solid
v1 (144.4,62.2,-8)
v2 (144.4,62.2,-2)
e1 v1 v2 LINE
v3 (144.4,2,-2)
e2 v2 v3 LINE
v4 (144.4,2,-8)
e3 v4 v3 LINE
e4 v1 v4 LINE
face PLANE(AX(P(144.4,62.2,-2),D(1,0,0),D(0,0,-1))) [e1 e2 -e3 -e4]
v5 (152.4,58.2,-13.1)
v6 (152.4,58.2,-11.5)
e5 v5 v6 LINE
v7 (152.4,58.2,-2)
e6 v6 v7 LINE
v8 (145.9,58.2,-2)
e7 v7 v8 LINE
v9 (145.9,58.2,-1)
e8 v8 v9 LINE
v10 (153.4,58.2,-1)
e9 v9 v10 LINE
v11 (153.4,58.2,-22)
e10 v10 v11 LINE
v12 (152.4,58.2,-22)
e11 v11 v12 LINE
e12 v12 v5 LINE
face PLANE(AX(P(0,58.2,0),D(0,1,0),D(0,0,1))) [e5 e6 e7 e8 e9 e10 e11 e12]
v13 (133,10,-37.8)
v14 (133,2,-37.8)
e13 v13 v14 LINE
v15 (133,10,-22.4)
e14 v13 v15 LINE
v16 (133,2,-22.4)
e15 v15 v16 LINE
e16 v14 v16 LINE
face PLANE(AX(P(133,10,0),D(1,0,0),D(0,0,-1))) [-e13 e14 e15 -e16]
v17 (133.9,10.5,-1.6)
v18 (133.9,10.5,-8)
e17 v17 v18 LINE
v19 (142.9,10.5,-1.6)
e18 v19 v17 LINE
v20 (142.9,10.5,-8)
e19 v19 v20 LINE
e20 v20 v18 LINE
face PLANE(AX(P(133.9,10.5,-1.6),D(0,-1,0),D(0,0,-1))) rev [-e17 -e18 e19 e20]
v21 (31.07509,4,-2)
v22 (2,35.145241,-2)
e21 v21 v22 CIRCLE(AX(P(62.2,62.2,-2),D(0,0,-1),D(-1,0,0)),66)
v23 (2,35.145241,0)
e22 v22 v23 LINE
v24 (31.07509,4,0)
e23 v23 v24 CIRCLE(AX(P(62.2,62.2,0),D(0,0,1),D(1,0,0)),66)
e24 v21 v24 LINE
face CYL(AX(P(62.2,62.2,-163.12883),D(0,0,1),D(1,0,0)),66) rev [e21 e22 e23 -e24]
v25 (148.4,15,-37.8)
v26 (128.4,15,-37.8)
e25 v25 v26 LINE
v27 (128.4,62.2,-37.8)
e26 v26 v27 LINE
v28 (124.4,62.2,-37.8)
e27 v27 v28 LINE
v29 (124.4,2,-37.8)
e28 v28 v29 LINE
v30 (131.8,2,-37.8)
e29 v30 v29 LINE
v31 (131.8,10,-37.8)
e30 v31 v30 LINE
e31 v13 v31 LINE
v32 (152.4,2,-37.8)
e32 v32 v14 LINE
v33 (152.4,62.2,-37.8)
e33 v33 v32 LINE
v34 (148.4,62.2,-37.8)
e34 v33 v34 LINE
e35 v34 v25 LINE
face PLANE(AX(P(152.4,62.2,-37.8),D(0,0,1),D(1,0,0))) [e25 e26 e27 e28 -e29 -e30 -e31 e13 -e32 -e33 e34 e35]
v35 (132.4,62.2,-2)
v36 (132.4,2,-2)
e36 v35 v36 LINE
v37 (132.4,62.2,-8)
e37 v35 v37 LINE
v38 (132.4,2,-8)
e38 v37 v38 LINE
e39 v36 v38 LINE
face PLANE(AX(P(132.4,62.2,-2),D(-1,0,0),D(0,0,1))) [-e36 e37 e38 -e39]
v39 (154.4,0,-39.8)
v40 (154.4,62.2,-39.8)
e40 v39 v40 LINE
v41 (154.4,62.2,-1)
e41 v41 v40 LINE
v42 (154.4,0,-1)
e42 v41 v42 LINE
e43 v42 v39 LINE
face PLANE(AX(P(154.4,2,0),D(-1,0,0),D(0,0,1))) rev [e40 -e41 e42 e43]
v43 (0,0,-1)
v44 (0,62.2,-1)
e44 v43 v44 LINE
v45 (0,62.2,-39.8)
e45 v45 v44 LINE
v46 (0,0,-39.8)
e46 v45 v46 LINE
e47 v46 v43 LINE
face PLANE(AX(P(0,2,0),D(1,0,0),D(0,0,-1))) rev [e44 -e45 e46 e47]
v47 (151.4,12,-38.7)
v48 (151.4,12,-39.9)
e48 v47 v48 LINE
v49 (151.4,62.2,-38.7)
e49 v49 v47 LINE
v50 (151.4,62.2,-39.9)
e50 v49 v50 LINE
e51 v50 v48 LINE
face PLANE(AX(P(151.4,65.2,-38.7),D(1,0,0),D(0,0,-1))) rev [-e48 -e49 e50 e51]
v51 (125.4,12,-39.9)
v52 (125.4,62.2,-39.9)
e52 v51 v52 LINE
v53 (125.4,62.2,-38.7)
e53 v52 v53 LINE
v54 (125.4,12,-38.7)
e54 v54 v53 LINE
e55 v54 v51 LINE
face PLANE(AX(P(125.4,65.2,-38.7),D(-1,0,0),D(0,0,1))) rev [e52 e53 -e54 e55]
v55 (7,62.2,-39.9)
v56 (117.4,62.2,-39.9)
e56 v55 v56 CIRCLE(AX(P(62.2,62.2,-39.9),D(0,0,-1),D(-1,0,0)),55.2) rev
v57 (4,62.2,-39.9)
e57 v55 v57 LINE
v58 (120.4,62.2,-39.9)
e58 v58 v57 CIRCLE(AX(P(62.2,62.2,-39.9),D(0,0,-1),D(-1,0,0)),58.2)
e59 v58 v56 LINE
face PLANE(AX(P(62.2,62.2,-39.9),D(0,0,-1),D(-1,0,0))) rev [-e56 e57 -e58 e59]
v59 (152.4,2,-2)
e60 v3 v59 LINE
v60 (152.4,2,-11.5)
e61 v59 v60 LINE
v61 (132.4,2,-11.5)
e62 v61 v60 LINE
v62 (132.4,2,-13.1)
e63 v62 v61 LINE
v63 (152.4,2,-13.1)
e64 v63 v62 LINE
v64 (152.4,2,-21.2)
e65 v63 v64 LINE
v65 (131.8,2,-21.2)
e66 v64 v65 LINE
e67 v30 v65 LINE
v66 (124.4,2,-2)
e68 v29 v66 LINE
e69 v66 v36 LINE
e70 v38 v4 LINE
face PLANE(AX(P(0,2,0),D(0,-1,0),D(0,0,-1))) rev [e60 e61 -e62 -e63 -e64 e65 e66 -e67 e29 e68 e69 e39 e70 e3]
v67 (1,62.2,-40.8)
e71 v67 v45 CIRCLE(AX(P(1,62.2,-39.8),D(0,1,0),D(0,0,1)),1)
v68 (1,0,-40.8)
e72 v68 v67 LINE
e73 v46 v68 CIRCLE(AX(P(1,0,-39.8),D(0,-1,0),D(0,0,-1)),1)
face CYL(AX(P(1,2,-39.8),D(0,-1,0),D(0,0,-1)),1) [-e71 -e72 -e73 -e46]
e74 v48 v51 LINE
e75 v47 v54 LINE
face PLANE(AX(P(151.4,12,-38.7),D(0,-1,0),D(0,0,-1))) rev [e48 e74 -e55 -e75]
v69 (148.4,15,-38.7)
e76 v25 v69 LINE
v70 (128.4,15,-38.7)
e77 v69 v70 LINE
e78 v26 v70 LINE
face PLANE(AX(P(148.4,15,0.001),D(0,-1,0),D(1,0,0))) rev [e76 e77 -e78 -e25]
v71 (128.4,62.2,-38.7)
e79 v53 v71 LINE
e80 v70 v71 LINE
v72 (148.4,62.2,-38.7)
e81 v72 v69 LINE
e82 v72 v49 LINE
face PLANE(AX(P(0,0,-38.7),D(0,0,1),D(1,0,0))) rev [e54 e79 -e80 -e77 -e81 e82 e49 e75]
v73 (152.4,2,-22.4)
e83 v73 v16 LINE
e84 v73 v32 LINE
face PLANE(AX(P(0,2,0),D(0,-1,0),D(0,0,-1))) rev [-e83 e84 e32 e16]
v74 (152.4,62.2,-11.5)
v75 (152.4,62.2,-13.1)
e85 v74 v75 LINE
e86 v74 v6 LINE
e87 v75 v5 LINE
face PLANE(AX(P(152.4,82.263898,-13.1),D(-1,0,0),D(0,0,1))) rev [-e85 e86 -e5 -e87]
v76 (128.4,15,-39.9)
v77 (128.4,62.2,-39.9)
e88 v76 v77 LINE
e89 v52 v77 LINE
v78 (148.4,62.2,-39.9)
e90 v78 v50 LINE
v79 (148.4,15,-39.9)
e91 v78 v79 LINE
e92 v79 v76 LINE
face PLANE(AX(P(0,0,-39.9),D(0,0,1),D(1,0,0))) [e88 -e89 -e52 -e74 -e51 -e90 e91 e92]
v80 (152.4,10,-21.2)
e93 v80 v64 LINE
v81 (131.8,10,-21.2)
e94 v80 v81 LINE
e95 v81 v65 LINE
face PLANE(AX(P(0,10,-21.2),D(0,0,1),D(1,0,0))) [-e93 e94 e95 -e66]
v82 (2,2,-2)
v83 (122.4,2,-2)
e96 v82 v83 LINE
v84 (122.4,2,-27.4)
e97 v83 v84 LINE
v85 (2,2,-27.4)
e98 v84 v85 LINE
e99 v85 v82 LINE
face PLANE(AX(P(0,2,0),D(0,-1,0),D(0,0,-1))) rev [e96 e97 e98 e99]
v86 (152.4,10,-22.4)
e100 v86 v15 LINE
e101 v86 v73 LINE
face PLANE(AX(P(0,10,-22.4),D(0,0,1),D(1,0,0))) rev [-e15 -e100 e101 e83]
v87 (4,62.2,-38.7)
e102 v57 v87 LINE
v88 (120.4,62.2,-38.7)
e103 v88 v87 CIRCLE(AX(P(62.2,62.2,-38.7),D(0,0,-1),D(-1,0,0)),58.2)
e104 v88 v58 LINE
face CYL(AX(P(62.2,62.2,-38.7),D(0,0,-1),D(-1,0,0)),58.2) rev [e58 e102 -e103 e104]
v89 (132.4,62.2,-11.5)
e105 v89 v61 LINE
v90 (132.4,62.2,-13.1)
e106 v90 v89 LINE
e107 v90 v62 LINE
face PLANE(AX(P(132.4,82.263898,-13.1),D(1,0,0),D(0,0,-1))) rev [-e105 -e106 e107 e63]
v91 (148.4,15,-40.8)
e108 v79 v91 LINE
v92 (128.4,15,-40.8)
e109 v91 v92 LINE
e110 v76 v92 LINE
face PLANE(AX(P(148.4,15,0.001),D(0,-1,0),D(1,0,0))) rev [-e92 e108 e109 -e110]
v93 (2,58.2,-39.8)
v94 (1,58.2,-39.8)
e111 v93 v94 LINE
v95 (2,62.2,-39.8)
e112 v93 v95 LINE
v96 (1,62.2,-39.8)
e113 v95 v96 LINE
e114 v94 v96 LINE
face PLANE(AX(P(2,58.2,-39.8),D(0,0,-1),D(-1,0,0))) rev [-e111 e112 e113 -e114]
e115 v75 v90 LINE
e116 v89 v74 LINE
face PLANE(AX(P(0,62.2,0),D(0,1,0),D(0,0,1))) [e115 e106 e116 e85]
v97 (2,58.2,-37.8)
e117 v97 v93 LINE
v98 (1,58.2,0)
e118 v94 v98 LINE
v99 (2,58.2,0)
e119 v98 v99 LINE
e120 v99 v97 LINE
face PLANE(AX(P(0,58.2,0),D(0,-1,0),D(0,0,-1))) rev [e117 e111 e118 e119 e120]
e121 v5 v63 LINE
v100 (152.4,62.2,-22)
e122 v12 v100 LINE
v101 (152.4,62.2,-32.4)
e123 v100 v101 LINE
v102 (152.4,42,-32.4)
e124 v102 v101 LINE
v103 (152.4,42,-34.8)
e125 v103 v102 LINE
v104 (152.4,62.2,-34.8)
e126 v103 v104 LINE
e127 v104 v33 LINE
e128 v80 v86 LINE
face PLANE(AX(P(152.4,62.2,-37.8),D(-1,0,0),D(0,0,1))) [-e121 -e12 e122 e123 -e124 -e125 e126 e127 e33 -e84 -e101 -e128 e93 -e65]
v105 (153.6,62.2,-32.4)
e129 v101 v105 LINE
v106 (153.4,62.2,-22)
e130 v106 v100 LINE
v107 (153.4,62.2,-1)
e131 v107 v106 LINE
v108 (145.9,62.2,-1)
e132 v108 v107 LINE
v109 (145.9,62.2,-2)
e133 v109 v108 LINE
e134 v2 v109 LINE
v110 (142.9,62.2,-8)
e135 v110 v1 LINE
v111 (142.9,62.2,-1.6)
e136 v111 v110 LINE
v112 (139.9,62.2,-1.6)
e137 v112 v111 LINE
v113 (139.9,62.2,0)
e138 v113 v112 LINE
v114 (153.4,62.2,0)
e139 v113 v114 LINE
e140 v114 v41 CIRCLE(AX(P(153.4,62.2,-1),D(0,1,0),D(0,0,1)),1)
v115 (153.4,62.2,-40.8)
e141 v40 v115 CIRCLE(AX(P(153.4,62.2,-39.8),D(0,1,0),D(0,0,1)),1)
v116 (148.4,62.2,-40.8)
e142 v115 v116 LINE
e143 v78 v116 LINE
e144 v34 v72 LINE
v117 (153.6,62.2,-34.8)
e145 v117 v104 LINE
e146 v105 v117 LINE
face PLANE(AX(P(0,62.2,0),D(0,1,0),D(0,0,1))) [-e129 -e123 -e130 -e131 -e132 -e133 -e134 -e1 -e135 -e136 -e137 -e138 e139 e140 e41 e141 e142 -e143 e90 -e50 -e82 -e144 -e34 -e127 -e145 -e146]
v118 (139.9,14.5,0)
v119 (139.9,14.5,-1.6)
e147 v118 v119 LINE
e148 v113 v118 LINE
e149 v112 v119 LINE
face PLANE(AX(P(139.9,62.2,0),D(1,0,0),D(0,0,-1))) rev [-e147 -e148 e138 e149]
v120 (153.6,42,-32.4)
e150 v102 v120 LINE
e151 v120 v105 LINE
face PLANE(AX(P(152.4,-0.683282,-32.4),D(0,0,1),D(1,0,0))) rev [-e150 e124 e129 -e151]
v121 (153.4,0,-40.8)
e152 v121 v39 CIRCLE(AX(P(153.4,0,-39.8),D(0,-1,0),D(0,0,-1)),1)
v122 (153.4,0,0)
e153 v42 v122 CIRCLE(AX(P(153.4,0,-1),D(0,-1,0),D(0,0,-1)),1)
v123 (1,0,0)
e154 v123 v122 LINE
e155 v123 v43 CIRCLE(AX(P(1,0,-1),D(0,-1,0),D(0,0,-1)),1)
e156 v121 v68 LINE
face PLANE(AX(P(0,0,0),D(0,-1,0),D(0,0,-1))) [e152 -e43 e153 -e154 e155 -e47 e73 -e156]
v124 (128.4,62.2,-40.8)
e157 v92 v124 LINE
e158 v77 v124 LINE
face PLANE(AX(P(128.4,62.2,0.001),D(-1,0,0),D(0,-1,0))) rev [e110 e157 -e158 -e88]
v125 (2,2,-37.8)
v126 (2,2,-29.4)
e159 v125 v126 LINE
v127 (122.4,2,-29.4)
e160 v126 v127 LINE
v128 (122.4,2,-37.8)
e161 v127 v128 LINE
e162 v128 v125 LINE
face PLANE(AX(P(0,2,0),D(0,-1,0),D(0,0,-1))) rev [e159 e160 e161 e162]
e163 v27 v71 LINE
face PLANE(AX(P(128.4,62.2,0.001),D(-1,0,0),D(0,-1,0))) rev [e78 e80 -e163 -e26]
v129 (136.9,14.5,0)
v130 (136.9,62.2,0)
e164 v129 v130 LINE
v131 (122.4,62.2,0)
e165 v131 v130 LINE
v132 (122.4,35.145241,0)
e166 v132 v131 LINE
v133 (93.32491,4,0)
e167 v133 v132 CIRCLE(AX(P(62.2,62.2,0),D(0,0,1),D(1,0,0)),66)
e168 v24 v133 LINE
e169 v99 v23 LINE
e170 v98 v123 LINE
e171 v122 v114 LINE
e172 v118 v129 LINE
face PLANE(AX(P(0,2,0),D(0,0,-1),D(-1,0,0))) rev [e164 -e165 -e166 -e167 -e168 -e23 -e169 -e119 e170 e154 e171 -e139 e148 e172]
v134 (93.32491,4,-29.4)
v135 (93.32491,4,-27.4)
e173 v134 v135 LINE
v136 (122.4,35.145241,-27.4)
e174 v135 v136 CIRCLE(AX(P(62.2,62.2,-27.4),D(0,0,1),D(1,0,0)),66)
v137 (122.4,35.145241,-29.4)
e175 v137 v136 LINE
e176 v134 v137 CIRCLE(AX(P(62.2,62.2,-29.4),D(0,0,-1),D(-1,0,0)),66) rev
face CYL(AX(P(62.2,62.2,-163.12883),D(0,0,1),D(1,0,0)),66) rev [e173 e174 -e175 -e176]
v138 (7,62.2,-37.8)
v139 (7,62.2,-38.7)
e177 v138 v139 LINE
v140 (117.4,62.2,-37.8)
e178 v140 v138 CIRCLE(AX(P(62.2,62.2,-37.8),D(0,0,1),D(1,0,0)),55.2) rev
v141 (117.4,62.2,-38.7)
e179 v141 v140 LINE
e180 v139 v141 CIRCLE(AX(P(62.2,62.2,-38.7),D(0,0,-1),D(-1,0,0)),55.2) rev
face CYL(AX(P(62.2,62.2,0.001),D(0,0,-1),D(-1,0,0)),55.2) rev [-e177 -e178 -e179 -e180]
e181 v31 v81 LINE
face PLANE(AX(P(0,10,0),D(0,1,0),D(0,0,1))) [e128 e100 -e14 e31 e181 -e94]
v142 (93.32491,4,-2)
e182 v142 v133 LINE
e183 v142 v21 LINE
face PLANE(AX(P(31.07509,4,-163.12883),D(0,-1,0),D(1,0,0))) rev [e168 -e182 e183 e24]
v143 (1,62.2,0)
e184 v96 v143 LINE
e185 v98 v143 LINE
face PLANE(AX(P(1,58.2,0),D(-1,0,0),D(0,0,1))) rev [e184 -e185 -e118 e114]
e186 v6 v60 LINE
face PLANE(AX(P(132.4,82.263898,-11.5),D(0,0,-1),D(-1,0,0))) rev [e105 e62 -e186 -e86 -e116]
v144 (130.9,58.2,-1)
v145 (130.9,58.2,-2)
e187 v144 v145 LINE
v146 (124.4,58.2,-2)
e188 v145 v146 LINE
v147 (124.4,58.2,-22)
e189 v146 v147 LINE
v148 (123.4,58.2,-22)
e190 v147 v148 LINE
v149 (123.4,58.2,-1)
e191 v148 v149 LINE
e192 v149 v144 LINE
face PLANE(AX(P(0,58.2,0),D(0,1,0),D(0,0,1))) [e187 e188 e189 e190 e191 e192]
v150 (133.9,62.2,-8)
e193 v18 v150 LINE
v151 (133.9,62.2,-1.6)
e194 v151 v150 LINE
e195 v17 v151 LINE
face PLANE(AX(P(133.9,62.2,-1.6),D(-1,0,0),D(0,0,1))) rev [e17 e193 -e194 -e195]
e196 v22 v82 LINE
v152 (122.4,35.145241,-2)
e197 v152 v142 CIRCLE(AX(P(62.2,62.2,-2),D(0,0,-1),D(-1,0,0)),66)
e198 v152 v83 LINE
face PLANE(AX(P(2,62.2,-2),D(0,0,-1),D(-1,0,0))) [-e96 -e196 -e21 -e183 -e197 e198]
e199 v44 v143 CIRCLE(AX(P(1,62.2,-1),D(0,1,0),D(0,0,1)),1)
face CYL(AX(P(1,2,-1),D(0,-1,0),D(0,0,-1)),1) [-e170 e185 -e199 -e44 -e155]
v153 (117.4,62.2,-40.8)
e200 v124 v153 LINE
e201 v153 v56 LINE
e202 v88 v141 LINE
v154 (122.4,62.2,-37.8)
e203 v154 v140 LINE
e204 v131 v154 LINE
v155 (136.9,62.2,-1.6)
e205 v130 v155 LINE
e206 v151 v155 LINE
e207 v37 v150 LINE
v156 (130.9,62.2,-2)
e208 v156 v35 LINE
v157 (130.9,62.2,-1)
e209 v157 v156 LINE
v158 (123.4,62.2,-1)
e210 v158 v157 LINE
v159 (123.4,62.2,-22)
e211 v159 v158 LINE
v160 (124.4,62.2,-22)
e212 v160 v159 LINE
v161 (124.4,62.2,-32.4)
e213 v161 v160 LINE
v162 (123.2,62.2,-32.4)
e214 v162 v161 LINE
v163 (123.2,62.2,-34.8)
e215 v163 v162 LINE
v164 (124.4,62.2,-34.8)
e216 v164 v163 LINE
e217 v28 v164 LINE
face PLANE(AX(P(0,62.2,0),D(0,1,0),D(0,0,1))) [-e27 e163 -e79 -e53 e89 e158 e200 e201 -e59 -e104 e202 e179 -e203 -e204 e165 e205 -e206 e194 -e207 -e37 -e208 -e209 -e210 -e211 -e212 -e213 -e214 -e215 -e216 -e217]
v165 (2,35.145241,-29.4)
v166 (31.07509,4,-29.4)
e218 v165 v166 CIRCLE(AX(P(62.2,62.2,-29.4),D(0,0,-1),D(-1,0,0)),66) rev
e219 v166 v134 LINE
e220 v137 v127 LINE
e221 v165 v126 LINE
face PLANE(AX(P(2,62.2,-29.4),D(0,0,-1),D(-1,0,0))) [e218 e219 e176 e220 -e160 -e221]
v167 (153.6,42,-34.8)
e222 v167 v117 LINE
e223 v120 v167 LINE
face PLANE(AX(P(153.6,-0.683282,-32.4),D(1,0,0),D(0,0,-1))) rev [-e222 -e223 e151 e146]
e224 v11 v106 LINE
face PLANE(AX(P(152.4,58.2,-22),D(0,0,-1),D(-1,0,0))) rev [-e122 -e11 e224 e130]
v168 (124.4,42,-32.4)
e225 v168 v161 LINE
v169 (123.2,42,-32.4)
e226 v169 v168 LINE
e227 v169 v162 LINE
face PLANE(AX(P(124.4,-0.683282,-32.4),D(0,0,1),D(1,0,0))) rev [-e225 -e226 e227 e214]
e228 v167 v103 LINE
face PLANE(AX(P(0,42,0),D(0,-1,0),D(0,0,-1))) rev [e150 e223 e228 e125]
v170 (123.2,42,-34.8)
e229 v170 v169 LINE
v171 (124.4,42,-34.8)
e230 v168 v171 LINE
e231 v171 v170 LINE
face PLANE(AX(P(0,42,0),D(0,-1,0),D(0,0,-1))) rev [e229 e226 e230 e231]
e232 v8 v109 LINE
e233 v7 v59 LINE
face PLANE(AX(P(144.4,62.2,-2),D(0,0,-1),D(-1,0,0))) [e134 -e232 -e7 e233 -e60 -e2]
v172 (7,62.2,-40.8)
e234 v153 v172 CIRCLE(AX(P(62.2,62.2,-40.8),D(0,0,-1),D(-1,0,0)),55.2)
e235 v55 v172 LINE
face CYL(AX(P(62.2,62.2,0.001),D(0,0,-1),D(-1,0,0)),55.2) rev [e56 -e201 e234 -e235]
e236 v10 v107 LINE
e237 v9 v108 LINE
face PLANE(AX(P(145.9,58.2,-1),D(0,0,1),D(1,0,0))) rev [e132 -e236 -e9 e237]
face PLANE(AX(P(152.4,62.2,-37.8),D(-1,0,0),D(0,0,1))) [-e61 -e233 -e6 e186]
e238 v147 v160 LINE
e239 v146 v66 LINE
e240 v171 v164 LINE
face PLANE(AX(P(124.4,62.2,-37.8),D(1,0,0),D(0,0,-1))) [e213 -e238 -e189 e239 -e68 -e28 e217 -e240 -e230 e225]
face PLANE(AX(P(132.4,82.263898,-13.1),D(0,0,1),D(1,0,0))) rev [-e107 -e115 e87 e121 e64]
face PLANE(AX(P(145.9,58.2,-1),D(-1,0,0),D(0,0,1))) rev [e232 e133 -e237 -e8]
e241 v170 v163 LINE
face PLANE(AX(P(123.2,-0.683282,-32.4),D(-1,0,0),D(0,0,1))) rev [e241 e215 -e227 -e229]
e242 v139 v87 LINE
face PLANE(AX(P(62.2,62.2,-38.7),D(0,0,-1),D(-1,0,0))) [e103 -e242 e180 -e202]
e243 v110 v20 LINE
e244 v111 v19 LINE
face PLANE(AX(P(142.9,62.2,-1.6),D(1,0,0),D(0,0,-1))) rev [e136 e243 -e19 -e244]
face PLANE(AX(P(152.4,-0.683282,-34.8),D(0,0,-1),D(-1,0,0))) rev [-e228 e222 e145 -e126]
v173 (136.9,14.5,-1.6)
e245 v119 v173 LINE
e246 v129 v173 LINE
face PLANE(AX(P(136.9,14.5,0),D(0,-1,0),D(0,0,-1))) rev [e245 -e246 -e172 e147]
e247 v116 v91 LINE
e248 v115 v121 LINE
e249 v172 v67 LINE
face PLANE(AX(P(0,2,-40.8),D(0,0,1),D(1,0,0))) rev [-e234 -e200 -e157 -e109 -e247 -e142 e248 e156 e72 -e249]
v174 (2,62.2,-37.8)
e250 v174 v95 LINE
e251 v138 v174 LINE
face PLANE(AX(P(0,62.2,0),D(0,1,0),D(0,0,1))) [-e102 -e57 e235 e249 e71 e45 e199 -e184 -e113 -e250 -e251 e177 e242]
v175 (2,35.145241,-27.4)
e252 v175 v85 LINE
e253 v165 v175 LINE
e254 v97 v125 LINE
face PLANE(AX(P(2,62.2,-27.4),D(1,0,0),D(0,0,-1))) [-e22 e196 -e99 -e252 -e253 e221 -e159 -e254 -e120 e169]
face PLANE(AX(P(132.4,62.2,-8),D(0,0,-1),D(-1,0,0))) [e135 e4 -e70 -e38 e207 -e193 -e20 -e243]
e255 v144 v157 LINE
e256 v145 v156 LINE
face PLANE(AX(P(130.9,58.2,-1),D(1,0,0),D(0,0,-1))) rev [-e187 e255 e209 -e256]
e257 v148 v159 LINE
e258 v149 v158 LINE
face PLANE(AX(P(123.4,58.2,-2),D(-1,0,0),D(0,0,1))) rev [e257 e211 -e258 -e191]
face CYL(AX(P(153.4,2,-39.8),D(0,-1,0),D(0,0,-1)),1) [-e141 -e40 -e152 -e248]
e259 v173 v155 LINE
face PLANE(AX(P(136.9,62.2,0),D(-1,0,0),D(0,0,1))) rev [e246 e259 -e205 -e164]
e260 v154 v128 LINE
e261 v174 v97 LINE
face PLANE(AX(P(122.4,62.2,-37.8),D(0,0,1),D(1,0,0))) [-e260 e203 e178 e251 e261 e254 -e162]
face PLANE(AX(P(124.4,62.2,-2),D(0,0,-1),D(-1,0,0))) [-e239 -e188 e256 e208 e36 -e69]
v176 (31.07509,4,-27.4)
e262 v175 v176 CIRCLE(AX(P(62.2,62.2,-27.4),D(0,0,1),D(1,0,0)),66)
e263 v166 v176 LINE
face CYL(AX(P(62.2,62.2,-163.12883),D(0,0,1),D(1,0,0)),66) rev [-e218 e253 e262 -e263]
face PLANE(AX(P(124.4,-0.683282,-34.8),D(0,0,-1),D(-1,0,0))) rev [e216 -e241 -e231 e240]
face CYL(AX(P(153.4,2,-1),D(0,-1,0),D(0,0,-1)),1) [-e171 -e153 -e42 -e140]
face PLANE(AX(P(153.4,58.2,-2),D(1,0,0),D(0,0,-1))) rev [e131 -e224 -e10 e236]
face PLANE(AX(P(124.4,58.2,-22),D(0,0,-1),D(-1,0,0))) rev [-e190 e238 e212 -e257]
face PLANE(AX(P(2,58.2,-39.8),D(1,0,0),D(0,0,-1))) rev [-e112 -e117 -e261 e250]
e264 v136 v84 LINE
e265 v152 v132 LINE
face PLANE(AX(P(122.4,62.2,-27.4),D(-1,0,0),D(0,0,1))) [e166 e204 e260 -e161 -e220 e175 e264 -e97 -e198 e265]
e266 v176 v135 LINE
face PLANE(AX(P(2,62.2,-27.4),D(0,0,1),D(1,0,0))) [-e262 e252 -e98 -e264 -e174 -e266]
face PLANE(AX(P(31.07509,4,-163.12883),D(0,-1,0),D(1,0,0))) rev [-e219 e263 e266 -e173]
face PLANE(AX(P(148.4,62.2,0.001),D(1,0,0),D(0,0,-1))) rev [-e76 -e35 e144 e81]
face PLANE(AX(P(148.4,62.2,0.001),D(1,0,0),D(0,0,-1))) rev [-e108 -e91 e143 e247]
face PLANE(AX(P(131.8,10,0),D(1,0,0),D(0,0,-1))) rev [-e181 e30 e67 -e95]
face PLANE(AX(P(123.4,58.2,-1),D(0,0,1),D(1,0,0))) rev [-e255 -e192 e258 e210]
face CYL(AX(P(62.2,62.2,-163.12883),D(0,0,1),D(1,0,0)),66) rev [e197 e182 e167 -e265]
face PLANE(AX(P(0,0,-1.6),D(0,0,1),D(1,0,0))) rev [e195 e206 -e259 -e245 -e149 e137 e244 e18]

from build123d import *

# Parameters (mm, degrees)
ESQUISSE1_W              = 154.4
ESQUISSE1_H              = 40.8
BOSS_EXTRU_1_DEPTH       = 2
ESQUISSE2_W              = 154.4
ESQUISSE2_H              = 40.8
ESQUISSE2_W_2            = 120.4
ESQUISSE2_H_2            = 8.4
ESQUISSE2_H_3            = 25.4
BOSS_EXTRU_2_DEPTH       = 60.2
ENL_V_MAT_EXTRU_1_REACH  = 173.385
ESQUISSE4_W              = 1
ESQUISSE4_H              = 39.8
ENL_V_MAT_EXTRU_2_DEPTH  = 4
ESQUISSE5_W              = 1.2
ESQUISSE5_H              = 2.4
ENL_V_MAT_EXTRU_3_DEPTH  = 20.2
BOSS_EXTRU_3_DEPTH       = 8
ESQUISSE9_W              = 9
ESQUISSE9_H              = 51.7
ENL_V_MAT_EXTRU_5_DEPTH  = 6.4
ESQUISSE10_W             = 3
ESQUISSE10_H             = 47.7
ENL_V_MAT_EXTRU_6_DEPTH  = 172.011227702
ESQUISSE11_W             = 20
ESQUISSE11_H             = 1.6
BOSS_EXTRU_4_DEPTH       = 60.2
ENL_V_MAT_EXTRU_7_REACH  = 173.385
ESQUISSE12_R             = 55.2
ENL_V_START              = -0.9
ESQUISSE14_R             = 58.2
ENL_V_MAT_EXTRU_8_DEPTH  = 1.2
CONG_1_R                 = 1
ENL_V_MAT_EXTRU_9_REACH  = 173.385
ESQUISSE15_W             = 20
ESQUISSE15_H             = 47.2
ESQUISSE16_W             = 26
ESQUISSE16_H             = 53.2
ESQUISSE16_W_2           = 20
ESQUISSE16_H_2           = 47.2
ENL_V_MAT_EXTRU_11_DEPTH = 1.2


with BuildPart() as part:
    # Esquisse1 → Boss.-Extru.1 (new body)
    with BuildSketch(Plane(origin=(0, 0, 0), x_dir=(1, 0, 0), z_dir=(0, 1, 0))):
        with Locations((77.2, 20.4)):
            Rectangle(ESQUISSE1_W, ESQUISSE1_H)
    extrude(amount=BOSS_EXTRU_1_DEPTH)

    # Esquisse2 → Boss.-Extru.2 (add)
    with BuildSketch(Plane(origin=(0, 2, 0), x_dir=(1, 0, 0), z_dir=(0, 1, 0))):
        with Locations((77.2, 20.4)):
            Rectangle(ESQUISSE2_W, ESQUISSE2_H)
        with Locations((62.2, 33.6)):
            Rectangle(ESQUISSE2_W_2, ESQUISSE2_H_2, mode=Mode.SUBTRACT)
        with Locations((62.2, 14.7)):
            Rectangle(ESQUISSE2_W_2, ESQUISSE2_H_3, mode=Mode.SUBTRACT)
        Polygon((124.4, 37.8), (124.4, 2), (132.4, 2), (132.4, 8), (144.4, 8), (144.4, 2), (152.4, 2), (152.4, 37.8), align=None, mode=Mode.SUBTRACT)
    extrude(amount=BOSS_EXTRU_2_DEPTH)

    # Enlèv. mat.-Extru.1: up to this face of the body (flat: up to its plane)
    enl_v_mat_extru_1_end = Plane(part.part.faces().sort_by_distance((62.2, 32.1, -29.4))[0])
    # Esquisse3 → Enlèv. mat.-Extru.1 (cut, up to the picked face)
    with BuildSketch(Plane.XY, mode=Mode.PRIVATE) as enl_v_mat_extru_1_sk1:
        with BuildLine():
            Line((2, 62.2), (122.4, 62.2))
            Line((122.4, 62.2), (122.4, 35.145240714))
            ThreePointArc((122.4, 35.145240714), (110.444857601, 17.16186377), (93.324909638, 4))
            Line((93.324909638, 4), (31.075090362, 4))
            ThreePointArc((31.075090362, 4), (13.955142399, 17.16186377), (2, 35.145240714))
            Line((2, 35.145240714), (2, 62.2))
        make_face()
    enl_v_mat_extru_1_tool1 = split(extrude(enl_v_mat_extru_1_sk1.sketch, amount=-ENL_V_MAT_EXTRU_1_REACH, mode=Mode.PRIVATE), bisect_by=enl_v_mat_extru_1_end, keep=Keep.BOTH, mode=Mode.PRIVATE)
    add(enl_v_mat_extru_1_tool1.solids().sort_by(Axis((62.2, 35.325026, 0), (0, 0, -1)))[0], mode=Mode.SUBTRACT)

    # Esquisse4 → Enlèv. mat.-Extru.2 (cut)
    with BuildSketch(Plane(origin=(0, 62.2, 0), x_dir=(1, 0, 0), z_dir=(0, 1, 0))):
        with Locations((1.5, 19.9)):
            Rectangle(ESQUISSE4_W, ESQUISSE4_H)
        Polygon((130.9, 1), (130.9, 2), (124.4, 2), (124.4, 22), (123.4, 22), (123.4, 2), (123.4, 1), align=None)
        Polygon((152.4, 2), (152.4, 22), (153.4, 22), (153.4, 2), (153.4, 1), (145.9, 1), (145.9, 2), align=None)
    extrude(amount=-ENL_V_MAT_EXTRU_2_DEPTH, mode=Mode.SUBTRACT)

    # Esquisse5 → Enlèv. mat.-Extru.3 (cut)
    with BuildSketch(Plane(origin=(0, 62.2, 0), x_dir=(1, 0, 0), z_dir=(0, 1, 0))):
        with Locations((123.8, 33.6)):
            Rectangle(ESQUISSE5_W, ESQUISSE5_H)
        with Locations((153, 33.6)):
            Rectangle(ESQUISSE5_W, ESQUISSE5_H)
    extrude(amount=-ENL_V_MAT_EXTRU_3_DEPTH, mode=Mode.SUBTRACT)

    # Esquisse6 → Boss.-Extru.3 (add)
    with BuildSketch(Plane(origin=(0, 2, 0), x_dir=(1, 0, 0), z_dir=(0, 1, 0))):
        Polygon((133, 22.4), (133, 37.8), (131.8, 37.8), (131.8, 21.2), (152.4, 21.2), (152.4, 22.4), align=None)
    extrude(amount=BOSS_EXTRU_3_DEPTH)

    # Esquisse9 → Enlèv. mat.-Extru.5 (cut)
    with BuildSketch(Plane(origin=(0, 0, -8), x_dir=(-1, 0, 0), z_dir=(0, 0, -1))):
        with Locations((-138.4, 36.35)):
            Rectangle(ESQUISSE9_W, ESQUISSE9_H)
    extrude(amount=-ENL_V_MAT_EXTRU_5_DEPTH, mode=Mode.SUBTRACT)

    # Esquisse10 → Enlèv. mat.-Extru.6 (cut, through all)
    with BuildSketch(Plane(origin=(0, 0, -1.6), x_dir=(-1, 0, 0), z_dir=(0, 0, -1))):
        with Locations((-138.4, 38.35)):
            Rectangle(ESQUISSE10_W, ESQUISSE10_H)
    extrude(amount=-ENL_V_MAT_EXTRU_6_DEPTH, mode=Mode.SUBTRACT)

    # Esquisse11 → Boss.-Extru.4 (add)
    with BuildSketch(Plane(origin=(0, 2, 0), x_dir=(1, 0, 0), z_dir=(0, 1, 0))):
        with Locations((142.4, 12.3)):
            Rectangle(ESQUISSE11_W, ESQUISSE11_H)
    extrude(amount=BOSS_EXTRU_4_DEPTH)

    # Esquisse12 → Enlèv. mat.-Extru.7 (cut, up to next)
    with BuildSketch(Plane(origin=(0, 0, -40.8), x_dir=(-1, 0, 0), z_dir=(0, 0, -1)), mode=Mode.PRIVATE) as enl_v_mat_extru_7_sk1:
        with Locations((-62.2, 62.2)):
            Circle(ESQUISSE12_R)
    enl_v_mat_extru_7_tool1 = extrude(enl_v_mat_extru_7_sk1.sketch, amount=-ENL_V_MAT_EXTRU_7_REACH, mode=Mode.PRIVATE) & part.part
    add(enl_v_mat_extru_7_tool1.solids().sort_by_distance((62.2, 62.2, -40.8))[0], mode=Mode.SUBTRACT)

    # Esquisse14 → Enlèv. mat.-Extru.8 (cut)
    with BuildSketch(Plane(origin=(0, 0, -40.8), x_dir=(-1, 0, 0), z_dir=(0, 0, -1)).offset(ENL_V_START)):
        with Locations((-62.2, 62.2)):
            Circle(ESQUISSE14_R)
    extrude(amount=-ENL_V_MAT_EXTRU_8_DEPTH, mode=Mode.SUBTRACT)

    # Congé1
    cong_1_edges = [part.edges().sort_by_distance(p)[0] for p in [
        (0, 31.1, -40.8),
        (154.4, 31.1, -40.8),
        (154.4, 31.1, 0),
        (0, 31.1, 0),
    ]]
    fillet(cong_1_edges, radius=CONG_1_R - 0.0001)  # a hair under: the kernel refuses the full size

    # Esquisse15 → Enlèv. mat.-Extru.9 (cut, up to next)
    with BuildSketch(Plane(origin=(0, 0, -40.8), x_dir=(-1, 0, 0), z_dir=(0, 0, -1)), mode=Mode.PRIVATE) as enl_v_mat_extru_9_sk1:
        with Locations((-138.4, 38.6)):
            Rectangle(ESQUISSE15_W, ESQUISSE15_H)
    enl_v_mat_extru_9_tool1 = extrude(enl_v_mat_extru_9_sk1.sketch, amount=-ENL_V_MAT_EXTRU_9_REACH, mode=Mode.PRIVATE) & part.part
    add(enl_v_mat_extru_9_tool1.solids().sort_by_distance((138.4, 38.6, -40.8))[0], mode=Mode.SUBTRACT)

    # Esquisse16 → Enlèv. mat.-Extru.11 (cut)
    with BuildSketch(Plane(origin=(0, 0, -40.8), x_dir=(-1, 0, 0), z_dir=(0, 0, -1)).offset(ENL_V_START)):
        with Locations((-138.4, 38.6)):
            Rectangle(ESQUISSE16_W, ESQUISSE16_H)
        with Locations((-138.4, 38.6)):
            Rectangle(ESQUISSE16_W_2, ESQUISSE16_H_2, mode=Mode.SUBTRACT)
    extrude(amount=-ENL_V_MAT_EXTRU_11_DEPTH, mode=Mode.SUBTRACT)


solid = part.part
